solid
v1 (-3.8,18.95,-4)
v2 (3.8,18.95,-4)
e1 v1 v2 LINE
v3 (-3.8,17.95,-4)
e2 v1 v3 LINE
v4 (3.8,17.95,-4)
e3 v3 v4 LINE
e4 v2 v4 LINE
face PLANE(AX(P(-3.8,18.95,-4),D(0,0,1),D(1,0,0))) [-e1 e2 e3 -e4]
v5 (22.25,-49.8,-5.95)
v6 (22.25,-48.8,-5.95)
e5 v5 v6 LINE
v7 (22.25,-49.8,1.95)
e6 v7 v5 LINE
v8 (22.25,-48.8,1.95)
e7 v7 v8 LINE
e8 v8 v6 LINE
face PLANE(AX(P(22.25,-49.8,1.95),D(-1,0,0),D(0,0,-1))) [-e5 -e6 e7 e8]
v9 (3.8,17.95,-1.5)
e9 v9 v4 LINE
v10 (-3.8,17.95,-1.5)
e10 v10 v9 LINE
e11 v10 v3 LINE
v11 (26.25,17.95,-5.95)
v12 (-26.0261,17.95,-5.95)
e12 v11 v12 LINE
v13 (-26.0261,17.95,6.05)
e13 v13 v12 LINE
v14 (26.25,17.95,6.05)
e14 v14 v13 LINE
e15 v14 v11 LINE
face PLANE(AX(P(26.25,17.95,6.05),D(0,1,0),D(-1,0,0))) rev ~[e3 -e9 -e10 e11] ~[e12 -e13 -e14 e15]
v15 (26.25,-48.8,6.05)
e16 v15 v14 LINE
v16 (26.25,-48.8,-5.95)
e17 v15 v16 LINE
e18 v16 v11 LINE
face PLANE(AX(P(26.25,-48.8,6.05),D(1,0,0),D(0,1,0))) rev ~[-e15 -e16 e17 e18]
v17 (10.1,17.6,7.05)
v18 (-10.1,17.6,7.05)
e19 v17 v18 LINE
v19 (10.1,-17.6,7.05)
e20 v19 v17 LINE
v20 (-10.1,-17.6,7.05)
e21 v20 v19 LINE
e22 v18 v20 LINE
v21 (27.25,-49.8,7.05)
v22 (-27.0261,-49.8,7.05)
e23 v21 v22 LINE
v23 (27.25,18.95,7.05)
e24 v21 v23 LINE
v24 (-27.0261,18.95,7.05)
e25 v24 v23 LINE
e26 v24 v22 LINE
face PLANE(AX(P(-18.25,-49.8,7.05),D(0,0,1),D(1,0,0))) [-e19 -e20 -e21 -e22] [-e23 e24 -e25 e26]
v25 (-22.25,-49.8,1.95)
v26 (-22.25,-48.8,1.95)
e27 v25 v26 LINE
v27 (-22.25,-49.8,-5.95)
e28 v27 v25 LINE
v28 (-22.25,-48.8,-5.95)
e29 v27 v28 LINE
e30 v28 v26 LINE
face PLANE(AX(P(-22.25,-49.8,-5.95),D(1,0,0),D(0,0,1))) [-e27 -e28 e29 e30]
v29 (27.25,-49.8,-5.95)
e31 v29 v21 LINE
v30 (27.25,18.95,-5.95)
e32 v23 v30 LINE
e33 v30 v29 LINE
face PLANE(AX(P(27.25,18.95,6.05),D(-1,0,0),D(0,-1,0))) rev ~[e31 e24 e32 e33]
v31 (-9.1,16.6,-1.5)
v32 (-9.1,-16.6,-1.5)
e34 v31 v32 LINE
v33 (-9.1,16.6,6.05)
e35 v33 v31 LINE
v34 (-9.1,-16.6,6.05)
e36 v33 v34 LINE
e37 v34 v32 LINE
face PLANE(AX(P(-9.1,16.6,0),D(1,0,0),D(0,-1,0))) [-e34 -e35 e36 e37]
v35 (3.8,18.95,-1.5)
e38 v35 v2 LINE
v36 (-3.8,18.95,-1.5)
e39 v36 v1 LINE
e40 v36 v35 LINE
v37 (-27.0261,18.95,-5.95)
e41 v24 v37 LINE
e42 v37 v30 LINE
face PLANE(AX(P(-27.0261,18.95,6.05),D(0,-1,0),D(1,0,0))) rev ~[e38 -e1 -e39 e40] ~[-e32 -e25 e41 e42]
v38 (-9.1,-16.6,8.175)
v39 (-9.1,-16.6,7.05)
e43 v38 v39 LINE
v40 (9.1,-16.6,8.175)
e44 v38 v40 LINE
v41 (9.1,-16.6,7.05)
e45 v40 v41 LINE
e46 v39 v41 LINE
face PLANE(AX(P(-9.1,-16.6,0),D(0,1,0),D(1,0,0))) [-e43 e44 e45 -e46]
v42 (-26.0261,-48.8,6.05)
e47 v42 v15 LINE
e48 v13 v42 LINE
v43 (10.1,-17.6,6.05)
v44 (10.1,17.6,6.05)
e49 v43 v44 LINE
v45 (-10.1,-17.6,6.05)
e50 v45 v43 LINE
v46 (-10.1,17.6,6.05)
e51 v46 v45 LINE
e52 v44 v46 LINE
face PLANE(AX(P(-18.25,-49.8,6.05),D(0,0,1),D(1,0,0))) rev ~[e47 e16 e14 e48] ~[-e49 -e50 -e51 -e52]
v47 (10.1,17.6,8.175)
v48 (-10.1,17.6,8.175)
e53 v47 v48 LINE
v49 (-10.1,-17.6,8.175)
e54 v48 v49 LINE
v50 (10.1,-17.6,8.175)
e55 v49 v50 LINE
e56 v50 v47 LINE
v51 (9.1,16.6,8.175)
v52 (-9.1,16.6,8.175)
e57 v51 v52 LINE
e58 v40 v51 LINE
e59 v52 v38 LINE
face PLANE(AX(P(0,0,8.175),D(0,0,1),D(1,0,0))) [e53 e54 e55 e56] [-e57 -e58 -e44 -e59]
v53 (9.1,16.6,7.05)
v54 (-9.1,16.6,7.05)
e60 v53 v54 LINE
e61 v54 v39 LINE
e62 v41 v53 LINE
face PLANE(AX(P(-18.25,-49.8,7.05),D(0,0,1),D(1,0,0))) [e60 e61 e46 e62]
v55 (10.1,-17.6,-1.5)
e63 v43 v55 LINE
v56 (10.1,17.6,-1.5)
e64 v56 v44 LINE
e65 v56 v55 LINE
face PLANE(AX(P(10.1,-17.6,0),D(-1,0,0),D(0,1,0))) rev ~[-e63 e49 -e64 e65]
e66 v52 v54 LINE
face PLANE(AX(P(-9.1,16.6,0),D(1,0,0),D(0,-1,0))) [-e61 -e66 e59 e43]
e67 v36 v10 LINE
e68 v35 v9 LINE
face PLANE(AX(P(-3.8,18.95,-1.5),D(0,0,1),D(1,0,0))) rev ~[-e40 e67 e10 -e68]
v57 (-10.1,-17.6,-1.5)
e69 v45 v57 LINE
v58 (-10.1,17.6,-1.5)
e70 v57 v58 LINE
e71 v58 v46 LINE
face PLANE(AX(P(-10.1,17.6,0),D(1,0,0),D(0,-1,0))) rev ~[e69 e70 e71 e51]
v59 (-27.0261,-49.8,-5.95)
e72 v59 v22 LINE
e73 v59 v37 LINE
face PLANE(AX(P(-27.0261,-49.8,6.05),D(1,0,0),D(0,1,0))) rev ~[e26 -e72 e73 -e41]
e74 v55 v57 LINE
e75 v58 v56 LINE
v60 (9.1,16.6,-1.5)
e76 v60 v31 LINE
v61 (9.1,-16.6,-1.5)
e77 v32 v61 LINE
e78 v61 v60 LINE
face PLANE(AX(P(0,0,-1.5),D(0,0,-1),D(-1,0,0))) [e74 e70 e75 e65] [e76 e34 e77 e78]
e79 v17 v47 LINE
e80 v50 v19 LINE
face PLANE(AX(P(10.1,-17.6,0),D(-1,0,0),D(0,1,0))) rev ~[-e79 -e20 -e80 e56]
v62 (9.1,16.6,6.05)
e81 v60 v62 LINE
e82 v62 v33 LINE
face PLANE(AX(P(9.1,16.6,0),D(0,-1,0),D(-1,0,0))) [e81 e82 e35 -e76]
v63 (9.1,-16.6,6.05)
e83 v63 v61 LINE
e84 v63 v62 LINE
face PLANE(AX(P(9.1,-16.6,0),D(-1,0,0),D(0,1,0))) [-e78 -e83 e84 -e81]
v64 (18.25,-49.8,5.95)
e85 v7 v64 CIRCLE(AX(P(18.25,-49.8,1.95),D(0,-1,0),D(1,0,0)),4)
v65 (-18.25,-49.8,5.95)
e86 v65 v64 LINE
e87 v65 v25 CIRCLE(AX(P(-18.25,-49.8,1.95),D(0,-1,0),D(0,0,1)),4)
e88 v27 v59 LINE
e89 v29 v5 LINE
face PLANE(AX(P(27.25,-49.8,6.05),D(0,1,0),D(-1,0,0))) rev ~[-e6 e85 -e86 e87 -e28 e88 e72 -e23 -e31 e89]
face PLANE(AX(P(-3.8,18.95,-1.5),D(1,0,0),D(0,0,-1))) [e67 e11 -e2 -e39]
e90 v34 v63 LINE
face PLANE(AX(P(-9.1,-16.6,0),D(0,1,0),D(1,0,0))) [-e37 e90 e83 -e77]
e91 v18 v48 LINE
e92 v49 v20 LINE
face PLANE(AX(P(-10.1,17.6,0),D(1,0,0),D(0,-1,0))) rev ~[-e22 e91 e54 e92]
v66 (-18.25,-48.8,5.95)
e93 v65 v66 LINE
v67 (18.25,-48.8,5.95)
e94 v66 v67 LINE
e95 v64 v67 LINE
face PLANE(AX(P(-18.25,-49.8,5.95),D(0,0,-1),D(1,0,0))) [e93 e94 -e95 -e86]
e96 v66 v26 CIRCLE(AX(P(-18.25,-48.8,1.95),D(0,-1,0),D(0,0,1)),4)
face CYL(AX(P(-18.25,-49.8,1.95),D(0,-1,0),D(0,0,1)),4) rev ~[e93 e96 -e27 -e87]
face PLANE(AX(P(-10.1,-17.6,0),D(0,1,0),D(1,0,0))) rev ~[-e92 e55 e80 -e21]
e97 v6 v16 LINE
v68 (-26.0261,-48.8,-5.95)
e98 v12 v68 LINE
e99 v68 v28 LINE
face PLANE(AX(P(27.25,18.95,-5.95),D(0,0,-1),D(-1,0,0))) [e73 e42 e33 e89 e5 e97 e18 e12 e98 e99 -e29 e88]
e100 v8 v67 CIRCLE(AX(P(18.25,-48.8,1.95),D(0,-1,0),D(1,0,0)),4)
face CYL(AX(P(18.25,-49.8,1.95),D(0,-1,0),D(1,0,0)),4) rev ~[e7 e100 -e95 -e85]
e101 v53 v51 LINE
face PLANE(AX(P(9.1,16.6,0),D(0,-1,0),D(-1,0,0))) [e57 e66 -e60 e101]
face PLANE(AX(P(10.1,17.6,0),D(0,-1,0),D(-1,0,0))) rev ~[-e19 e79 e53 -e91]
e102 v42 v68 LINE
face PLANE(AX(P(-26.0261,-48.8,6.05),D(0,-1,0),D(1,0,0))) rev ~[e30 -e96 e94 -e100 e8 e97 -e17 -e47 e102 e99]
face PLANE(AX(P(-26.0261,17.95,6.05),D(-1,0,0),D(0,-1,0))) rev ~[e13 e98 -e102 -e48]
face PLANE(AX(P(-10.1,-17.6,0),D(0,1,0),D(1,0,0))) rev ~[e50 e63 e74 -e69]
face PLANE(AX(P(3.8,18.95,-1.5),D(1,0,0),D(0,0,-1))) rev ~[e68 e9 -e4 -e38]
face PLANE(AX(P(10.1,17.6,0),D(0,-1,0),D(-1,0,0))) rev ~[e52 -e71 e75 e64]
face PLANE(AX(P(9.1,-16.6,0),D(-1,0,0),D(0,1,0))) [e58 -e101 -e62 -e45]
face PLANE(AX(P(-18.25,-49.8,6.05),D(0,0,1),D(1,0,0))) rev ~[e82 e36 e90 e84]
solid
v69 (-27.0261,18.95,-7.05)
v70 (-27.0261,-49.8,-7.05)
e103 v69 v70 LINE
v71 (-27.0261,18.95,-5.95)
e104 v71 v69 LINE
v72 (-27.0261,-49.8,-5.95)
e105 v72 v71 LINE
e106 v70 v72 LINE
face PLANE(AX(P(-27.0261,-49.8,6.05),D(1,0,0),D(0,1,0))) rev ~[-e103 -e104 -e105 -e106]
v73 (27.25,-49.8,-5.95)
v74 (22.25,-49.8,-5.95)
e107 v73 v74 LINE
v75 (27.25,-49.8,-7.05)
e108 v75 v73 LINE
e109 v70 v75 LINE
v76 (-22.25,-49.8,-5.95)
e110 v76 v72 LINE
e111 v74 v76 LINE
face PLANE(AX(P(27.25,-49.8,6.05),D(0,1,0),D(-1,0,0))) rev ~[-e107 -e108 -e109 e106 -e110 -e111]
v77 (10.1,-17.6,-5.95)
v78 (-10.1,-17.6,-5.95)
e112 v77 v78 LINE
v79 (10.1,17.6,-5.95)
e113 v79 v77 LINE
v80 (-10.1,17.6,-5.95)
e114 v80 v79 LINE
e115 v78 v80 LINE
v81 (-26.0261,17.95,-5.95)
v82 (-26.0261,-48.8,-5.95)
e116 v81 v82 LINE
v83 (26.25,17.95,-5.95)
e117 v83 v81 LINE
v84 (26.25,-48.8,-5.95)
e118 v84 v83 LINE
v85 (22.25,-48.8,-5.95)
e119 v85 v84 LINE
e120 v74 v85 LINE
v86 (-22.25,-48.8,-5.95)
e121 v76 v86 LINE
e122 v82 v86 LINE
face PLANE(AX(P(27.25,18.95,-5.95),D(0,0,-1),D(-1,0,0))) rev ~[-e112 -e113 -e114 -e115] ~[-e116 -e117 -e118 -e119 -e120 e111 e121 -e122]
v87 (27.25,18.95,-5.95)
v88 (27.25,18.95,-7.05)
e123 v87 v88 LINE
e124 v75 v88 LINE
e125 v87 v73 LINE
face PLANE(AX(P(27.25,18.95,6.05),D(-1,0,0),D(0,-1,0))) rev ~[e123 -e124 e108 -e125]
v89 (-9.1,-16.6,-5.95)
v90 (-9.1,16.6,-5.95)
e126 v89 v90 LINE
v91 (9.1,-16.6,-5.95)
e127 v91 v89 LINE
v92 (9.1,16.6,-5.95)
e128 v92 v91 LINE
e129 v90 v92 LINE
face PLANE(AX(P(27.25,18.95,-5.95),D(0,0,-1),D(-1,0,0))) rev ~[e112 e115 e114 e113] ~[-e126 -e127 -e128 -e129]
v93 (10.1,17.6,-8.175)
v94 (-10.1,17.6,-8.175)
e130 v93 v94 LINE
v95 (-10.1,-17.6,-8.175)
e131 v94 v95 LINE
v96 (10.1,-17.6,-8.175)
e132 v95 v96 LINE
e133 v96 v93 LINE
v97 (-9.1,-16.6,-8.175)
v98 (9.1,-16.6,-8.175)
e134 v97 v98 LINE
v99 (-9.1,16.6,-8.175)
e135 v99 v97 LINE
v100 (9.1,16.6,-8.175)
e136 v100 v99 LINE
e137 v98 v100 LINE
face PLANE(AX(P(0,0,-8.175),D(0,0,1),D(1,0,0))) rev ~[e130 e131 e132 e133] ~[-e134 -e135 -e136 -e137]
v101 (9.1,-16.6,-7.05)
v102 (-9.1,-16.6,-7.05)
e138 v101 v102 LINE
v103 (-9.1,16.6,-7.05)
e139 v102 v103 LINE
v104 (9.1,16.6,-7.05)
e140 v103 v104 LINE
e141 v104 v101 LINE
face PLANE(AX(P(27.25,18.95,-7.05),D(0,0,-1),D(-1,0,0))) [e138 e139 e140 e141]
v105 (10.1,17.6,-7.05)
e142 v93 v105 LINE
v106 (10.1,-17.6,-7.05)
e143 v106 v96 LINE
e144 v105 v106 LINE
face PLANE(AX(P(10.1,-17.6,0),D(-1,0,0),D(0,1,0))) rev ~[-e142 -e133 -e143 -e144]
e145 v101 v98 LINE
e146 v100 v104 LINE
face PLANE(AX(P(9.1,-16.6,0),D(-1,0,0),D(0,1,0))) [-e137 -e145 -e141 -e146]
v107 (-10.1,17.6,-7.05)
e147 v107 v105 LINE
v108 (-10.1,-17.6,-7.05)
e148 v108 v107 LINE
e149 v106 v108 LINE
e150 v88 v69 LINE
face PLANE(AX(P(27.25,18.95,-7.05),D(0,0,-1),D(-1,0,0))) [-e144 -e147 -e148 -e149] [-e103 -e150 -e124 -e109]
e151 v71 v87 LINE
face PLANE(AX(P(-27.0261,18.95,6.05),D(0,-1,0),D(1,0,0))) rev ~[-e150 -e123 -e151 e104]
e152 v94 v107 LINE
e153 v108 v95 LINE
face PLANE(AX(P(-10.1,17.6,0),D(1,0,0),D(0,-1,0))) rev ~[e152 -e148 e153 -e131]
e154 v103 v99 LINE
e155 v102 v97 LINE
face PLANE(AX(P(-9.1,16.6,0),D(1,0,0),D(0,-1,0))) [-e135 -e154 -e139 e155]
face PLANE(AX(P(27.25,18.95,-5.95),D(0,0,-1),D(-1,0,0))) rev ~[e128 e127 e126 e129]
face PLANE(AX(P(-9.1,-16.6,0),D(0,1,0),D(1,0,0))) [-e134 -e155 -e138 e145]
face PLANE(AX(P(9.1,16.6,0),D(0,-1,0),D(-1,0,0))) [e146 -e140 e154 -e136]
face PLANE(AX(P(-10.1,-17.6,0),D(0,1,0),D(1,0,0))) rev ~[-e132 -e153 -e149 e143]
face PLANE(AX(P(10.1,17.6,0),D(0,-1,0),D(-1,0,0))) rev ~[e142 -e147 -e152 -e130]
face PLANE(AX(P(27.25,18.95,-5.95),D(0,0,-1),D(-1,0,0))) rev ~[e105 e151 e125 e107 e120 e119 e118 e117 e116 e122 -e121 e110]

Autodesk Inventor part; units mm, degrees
ref_plane "YZ Plane" through (0, 0, 0) normal (1, 0, 0) x (0, 1, 0)
sketch "Sketch1" plane through (0, 0, 0) normal (0, 0, 1) x (1, 0, 0)
  line L0 (-9, 16.5) -> (9, 16.5) construction
  line L1 (9, 16.5) -> (9, -16.5) construction
  line L2 (-9, -16.5) -> (-9, 16.5) construction
  line L3 (9, -16.5) -> (-9, -16.5) construction
  line L4 (9.1, 16.6) -> (-9.1, 16.6)
  line L5 (-9.1, 16.6) -> (-9.1, -16.6)
  line L6 (-9.1, -16.6) -> (9.1, -16.6)
  line L7 (9.1, -16.6) -> (9.1, 16.6)
  line L8 (10.1, 17.6) -> (-10.1, 17.6)
  line L9 (-10.1, 17.6) -> (-10.1, -17.6)
  line L10 (-10.1, -17.6) -> (10.1, -17.6)
  line L11 (10.1, -17.6) -> (10.1, 17.6)
  point P0 (0, 0)
  dimension "d0" = 0.1
  dimension "d1" = 1
extrude "Extrusion1" add sketch "Sketch1" along normal mid plane 16.35
sketch "Sketch2" plane through (-10.1, -17.6, 8.175) normal (0, -1, 0) x (1, 0, 0)
  point P0 (10.1, -8.175)
  point P1 (10.1, -8.175)
ref_plane "Work Plane1" through (-18.25, -49.8, 6.05) normal (0, 0, 1) x (1, 0, 0)
sketch "Sketch3" plane through (-18.25, -49.8, 6.05) normal (0, 0, 1) x (1, 0, 0)
  line L0 (36.5, 14) -> (0, 14) construction
  line L1 (36.5, 14) -> (36.5, 22.2) construction
  line L2 (0, 22.2) -> (36.5, 22.2) construction
  line L3 (0, 14) -> (0, 22.2) construction
  line L4 (40.5, 0) -> (-4, 0) construction
  line L5 (-4, 0) -> (-4, 14) construction
  line L6 (40.5, 14) -> (-4, 14) construction
  line L7 (40.5, 0) -> (40.5, 14) construction
  line L8 (40.5, 0) -> (-4, 0)
  line L9 (-4, 0) -> (-8.7761, 0)
  line L10 (40.5, 0) -> (45.5, 0)
  line L11 (45.5, 0) -> (45.5, 67.4)
  line L12 (-8.7761, 67.4) -> (-8.7761, 0)
  line L13 (14.45, 68.75) -> (22.05, 68.75) construction
  line L14 (-8.7761, 67.4) -> (-8.7761, 68.75)
  line L15 (-8.7761, 68.75) -> (45.5, 68.75)
  line L16 (45.5, 68.75) -> (45.5, 67.4)
  point P0 (18.25, 49.8)
  dimension "d4" = 5
extrude "Extrusion2" add sketch "Sketch3" along normal blind 1
sketch "Sketch4" plane through (-18.25, -49.8, 6.05) normal (0, 0, -1) x (-1, 0, 0)
  line L0 (-27.35, 33.2) -> (-27.35, 66.4) projected
  line L1 (-27.35, 66.4) -> (-9.15, 66.4) projected
  line L2 (-9.15, 66.4) -> (-9.15, 33.2) projected
  line L3 (-9.15, 33.2) -> (-27.35, 33.2) projected
  line L4 (-8.15, 67.4) -> (-28.35, 67.4) projected
  line L5 (-28.35, 67.4) -> (-28.35, 32.2) projected
  line L6 (-28.35, 32.2) -> (-8.15, 32.2) projected
  line L7 (-8.15, 32.2) -> (-8.15, 67.4) projected
  point P0 (-18.25, 49.8)
extrude "Extrusion3" [suppressed]
sketch "Sketch5" plane through (-18.25, -49.8, 6.05) normal (0, 0, -1) x (-1, 0, 0)
  line L0 (8.7761, 68.75) -> (-45.5, 68.75) projected
  line L1 (-45.5, 68.75) -> (-45.5, 0) projected
  line L2 (8.7761, 0) -> (8.7761, 68.75) projected
  line L3 (-45.5, 0) -> (8.7761, 0) projected
  line L4 (-44.5, 67.75) -> (7.7761, 67.75)
  line L5 (7.7761, 67.75) -> (7.7761, 1)
  line L6 (7.7761, 1) -> (-44.5, 1)
  line L7 (-44.5, 1) -> (-44.5, 67.75)
  point P0 (-18.25, 49.8)
  dimension "d9" = 1
ref_plane "Work Plane2" through (-22.25, -49.8, -5.95) normal (0, 0, -1) x (0, 1, 0)
extrude "Extrusion4" add sketch "Sketch5" along normal up to surface (12 mm away)
sketch "Sketch6" plane through (-27.0261, -49.8, 7.05) normal (0, -1, 0) x (1, 0, 0)
  arc A0 (8.7761, -1.1) -> (4.7761, -5.1) centre (8.7761, -5.1) ccw projected
  line L0 (4.7761, -13) -> (4.7761, -5.1) projected
  line L1 (8.7761, -1.1) -> (45.2761, -1.1) projected
  arc A1 (49.2761, -5.1) -> (45.2761, -1.1) centre (45.2761, -5.1) ccw projected
  line L2 (49.2761, -5.1) -> (49.2761, -13) projected
  line L3 (0, -13) -> (54.2761, -13) construction
  line L4 (49.2761, -13) -> (4.7761, -13)
  line L5 (54.2761, -13) -> (0, -13) projected
  point P0 (27.0261, -7.05)
extrude "Extrusion5" cut sketch "Sketch6" against normal blind 1
ref_plane "Work Plane3" through (27.25, 18.95, -6.05) normal (0, 0, -1) x (-1, 0, 0)
sketch "Sketch7" plane through (27.25, 18.95, -6.05) normal (0, 0, -1) x (-1, 0, 0)
  line L0 (54.2761, 0) -> (54.2761, -68.75) projected
  line L1 (0, 0) -> (54.2761, 0) projected
  line L2 (0, -68.75) -> (0, 0) projected
  line L3 (5, -68.75) -> (0, -68.75) projected
  line L4 (54.2761, -68.75) -> (49.5, -68.75) projected
  line L5 (5, -68.75) -> (49.5, -68.75)
  line L6 (9, -67.75) -> (45.5, -67.75) projected
  point P0 (27.25, -18.95)
extrude "Extrusion6" add sketch "Sketch7" along normal blind 1 and the other way blind 0.1
sketch "Sketch8" plane through (-27.0261, 18.95, 7.05) normal (0, 1, 0) x (1, 0, 0)
  line L0 (23.2261, 11.05) -> (30.8261, 11.05) projected
  line L1 (23.2261, 8.55) -> (23.2261, 11.05) projected
  line L2 (30.8261, 8.55) -> (30.8261, 11.05) projected
  line L3 (23.2261, 8.55) -> (30.8261, 8.55) projected
  point P0 (27.0261, 7.05)
extrude "Extrusion7" cut sketch "Sketch8" against normal blind 1
ref_plane "Work Plane4" through (27.25, 18.95, -5.95) normal (0, 0, -1) x (-1, 0, 0)
split body "Split1" result two bodies by plane through (27.25, 18.95, -5.95) normal (0, 0, -1) first body at (3.4413, -39.0667, -6.55)
sketch "Sketch9" plane through (0, 0, -8.175) normal (0, 0, -1) x (-1, 0, 0)
  line L0 (-9.1, -16.6) -> (-9.1, 16.6) projected
  line L1 (-9.1, 16.6) -> (9.1, 16.6) projected
  line L2 (9.1, 16.6) -> (9.1, -16.6) projected
  line L3 (9.1, -16.6) -> (-9.1, -16.6) projected
  line L4 (10.1, 17.6) -> (-10.1, 17.6) projected
  line L5 (-10.1, 17.6) -> (-10.1, -17.6) projected
  line L6 (-10.1, -17.6) -> (10.1, -17.6) projected
  line L7 (10.1, -17.6) -> (10.1, 17.6) projected
  point P0 (0, 0)
ref_plane "Work Plane5" through (-9, -16.5, -1.5) normal (0, 0, -1) x (0, 1, 0)
extrude "Extrusion8" cut sketch "Sketch9" against normal up to surface (6.675 mm away) bodies 3
properties part number "box_low"
